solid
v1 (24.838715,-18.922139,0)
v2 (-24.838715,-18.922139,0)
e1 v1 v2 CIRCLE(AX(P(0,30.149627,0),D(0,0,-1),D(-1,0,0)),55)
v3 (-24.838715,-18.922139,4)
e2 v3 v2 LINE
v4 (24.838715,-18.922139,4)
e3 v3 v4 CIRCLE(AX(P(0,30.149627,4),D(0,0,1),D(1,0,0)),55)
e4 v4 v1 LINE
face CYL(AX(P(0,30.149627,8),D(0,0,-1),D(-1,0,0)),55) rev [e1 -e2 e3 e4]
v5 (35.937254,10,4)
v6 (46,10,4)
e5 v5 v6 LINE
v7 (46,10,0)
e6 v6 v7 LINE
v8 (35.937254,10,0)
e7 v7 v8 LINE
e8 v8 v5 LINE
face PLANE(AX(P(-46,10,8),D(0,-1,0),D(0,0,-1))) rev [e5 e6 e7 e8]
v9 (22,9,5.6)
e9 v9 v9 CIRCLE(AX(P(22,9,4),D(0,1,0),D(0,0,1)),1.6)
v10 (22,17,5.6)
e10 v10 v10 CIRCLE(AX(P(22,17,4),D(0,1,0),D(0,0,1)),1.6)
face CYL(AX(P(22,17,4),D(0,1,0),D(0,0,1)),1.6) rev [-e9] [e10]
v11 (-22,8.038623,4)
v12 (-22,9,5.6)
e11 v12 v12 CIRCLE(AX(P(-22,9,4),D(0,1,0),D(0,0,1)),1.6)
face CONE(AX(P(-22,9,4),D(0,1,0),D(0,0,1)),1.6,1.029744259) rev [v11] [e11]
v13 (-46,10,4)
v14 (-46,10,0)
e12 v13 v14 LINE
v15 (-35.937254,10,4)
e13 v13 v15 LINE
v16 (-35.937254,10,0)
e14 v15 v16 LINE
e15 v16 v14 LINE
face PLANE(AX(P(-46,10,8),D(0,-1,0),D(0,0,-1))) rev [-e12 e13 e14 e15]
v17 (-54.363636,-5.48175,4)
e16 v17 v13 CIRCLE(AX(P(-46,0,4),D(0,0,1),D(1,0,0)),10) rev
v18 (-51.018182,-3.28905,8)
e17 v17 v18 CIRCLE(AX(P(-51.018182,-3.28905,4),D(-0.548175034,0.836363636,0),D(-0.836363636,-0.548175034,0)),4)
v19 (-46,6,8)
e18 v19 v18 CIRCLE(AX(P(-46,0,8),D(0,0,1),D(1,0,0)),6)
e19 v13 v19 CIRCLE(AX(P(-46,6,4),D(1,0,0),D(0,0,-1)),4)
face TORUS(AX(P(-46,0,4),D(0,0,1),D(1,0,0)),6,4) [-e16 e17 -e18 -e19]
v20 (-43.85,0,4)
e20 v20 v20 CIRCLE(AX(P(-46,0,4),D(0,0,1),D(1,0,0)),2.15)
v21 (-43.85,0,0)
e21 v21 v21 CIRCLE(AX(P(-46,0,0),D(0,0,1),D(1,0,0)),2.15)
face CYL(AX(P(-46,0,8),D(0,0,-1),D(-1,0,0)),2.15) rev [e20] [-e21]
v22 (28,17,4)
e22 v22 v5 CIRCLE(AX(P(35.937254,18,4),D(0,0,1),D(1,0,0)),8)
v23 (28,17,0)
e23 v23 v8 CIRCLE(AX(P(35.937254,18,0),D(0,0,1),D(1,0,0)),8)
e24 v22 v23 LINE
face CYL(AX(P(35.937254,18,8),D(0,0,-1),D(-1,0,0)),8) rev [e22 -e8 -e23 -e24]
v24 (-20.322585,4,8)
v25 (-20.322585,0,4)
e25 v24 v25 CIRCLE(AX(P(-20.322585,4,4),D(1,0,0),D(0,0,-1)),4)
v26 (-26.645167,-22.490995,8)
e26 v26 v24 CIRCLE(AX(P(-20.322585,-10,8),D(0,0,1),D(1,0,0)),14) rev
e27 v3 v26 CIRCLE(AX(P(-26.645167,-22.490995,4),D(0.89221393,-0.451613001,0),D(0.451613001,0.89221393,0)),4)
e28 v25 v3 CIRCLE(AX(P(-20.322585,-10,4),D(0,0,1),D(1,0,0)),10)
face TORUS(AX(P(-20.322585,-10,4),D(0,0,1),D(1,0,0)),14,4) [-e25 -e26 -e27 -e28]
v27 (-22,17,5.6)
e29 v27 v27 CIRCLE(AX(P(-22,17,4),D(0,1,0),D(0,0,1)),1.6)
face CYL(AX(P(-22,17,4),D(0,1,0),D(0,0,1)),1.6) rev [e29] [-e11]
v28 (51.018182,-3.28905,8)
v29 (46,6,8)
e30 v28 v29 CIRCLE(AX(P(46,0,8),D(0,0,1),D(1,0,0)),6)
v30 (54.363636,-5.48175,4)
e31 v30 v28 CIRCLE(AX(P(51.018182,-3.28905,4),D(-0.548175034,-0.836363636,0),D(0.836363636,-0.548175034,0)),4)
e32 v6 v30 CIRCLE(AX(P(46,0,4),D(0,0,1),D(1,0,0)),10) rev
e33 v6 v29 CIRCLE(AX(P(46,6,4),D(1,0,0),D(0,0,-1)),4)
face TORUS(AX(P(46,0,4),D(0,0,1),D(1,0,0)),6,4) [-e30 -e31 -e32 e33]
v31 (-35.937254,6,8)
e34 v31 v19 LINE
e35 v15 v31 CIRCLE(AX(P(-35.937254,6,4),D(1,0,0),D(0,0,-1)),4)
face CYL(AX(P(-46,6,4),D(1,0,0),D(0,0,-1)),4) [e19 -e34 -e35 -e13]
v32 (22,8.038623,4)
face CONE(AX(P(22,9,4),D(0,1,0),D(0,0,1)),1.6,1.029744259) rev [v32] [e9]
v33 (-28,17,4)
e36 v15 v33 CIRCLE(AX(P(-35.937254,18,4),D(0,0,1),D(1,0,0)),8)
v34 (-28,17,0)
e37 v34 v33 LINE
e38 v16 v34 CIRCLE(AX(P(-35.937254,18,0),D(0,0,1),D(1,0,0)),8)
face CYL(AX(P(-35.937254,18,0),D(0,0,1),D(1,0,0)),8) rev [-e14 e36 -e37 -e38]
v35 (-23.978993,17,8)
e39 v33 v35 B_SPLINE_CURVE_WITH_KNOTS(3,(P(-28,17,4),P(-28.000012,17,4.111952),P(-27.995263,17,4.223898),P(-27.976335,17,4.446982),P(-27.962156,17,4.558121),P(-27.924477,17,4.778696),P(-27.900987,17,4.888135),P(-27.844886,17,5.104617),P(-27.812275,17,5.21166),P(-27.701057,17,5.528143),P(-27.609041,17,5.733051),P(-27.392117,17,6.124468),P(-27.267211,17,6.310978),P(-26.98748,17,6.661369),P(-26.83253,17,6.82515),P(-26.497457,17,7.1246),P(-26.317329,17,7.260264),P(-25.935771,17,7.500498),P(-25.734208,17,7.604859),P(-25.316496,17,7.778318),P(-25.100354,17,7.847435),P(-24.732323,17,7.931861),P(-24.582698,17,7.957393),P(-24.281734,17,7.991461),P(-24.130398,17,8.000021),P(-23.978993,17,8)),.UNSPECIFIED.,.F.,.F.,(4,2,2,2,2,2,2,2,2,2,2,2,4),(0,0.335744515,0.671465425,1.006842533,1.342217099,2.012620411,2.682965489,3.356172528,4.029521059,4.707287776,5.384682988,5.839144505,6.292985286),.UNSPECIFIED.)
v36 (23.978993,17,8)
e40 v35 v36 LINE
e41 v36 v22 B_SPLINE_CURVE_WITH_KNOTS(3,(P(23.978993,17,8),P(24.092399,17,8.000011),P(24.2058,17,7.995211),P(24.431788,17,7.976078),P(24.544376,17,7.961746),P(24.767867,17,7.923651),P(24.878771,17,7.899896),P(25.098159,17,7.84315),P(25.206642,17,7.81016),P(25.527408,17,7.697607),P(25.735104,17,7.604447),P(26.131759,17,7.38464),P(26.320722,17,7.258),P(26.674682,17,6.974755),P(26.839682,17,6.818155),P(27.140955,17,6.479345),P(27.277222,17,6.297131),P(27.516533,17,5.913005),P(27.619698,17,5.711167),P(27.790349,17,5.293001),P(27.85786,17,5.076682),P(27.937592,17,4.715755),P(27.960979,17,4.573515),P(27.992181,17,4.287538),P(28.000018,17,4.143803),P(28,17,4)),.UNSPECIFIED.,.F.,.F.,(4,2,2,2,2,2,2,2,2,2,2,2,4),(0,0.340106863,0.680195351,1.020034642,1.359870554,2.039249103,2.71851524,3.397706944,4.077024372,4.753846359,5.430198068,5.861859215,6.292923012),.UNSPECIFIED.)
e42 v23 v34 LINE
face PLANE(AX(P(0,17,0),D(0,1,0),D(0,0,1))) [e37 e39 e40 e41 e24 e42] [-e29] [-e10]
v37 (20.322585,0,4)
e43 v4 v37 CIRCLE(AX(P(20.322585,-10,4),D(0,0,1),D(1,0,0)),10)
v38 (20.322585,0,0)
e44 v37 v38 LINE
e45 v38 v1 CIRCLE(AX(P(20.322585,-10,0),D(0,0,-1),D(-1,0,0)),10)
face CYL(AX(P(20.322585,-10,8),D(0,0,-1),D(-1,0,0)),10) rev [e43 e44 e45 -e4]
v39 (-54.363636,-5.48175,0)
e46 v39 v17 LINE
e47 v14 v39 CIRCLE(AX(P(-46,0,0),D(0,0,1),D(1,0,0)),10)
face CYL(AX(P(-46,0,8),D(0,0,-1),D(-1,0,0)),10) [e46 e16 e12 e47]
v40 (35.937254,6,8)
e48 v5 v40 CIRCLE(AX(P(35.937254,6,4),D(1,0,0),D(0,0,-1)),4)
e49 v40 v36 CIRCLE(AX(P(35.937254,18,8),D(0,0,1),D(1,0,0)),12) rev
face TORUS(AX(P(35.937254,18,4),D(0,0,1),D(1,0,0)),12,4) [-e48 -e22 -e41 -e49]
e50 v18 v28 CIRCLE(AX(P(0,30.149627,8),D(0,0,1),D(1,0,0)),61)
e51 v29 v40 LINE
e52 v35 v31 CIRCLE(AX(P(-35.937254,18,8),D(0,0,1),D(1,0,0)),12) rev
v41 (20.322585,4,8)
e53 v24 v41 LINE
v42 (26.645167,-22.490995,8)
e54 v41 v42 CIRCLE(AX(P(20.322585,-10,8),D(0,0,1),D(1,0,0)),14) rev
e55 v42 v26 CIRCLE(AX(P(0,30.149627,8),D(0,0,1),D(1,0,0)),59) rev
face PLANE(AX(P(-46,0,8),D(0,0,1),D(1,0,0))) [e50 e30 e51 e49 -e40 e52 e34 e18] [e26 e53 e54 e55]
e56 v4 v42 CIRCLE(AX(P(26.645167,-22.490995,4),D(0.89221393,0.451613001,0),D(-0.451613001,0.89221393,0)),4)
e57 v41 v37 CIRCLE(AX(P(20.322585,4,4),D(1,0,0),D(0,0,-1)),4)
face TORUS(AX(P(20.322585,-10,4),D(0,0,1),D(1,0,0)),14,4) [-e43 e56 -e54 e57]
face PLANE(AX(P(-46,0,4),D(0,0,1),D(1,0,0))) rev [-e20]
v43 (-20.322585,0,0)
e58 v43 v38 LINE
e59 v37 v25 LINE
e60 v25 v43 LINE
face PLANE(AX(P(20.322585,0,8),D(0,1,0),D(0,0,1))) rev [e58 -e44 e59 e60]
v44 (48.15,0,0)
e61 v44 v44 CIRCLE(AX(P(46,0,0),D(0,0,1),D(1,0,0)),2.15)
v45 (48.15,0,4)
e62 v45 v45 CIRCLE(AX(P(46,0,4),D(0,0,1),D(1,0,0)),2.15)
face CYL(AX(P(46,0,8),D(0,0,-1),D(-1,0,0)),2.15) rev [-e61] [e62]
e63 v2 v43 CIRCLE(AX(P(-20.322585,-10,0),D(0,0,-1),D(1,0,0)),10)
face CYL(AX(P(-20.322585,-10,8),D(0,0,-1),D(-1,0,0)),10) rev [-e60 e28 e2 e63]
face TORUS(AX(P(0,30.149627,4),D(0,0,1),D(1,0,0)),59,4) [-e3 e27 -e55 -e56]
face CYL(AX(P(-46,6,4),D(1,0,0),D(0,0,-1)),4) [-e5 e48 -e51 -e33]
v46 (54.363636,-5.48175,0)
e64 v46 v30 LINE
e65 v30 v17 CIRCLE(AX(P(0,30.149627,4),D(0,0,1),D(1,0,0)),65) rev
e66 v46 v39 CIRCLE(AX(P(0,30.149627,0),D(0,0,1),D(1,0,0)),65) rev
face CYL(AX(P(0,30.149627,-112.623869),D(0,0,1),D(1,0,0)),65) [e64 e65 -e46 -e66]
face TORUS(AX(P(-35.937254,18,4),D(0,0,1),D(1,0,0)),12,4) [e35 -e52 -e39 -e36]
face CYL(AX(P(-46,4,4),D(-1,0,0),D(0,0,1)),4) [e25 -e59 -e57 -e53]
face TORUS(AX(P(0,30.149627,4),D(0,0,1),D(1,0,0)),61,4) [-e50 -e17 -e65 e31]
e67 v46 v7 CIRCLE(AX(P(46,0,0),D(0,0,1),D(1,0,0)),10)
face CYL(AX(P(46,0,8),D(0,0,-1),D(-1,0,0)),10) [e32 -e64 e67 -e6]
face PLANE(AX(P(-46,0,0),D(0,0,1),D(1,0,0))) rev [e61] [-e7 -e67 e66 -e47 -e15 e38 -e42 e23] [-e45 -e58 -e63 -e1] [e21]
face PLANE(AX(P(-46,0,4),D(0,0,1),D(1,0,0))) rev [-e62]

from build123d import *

# Parameters (mm, degrees)
SKETCH1_R                = 2.15
BOSS_EXTRUDE1_DEPTH      = 8
BOSS_EXTRUDE2_START      = -4
BOSS_EXTRUDE2_DEPTH      = 4
SKETCH3_W                = 56
SKETCH3_H                = 8
BOSS_EXTRUDE6_DEPTH      = 7
BOSS_EXTRUDE4_START      = -8
BOSS_EXTRUDE4_DEPTH      = 8
CUT_EXTRUDE1_DEPTH       = 67.44206881
FILLET4_R                = 8
FILLET3_R                = 4
M3_CLEARANCE_HOLE1_D     = 3.2
M3_CLEARANCE_HOLE1_DEPTH = 8
M3_CLEARANCE_HOLE1_TIP   = 0.96137699


with BuildPart() as part:
    # Sketch1 → Boss-Extrude1 (new body)
    with BuildSketch(Plane.XY):
        with BuildLine():
            Line((-46, 10), (46, 10))
            ThreePointArc((46, 10), (56, 0), (46, -10))
            Line((46, -10), (-46, -10))
            ThreePointArc((-46, -10), (-56, 0), (-46, 10))
        make_face()
        with Locations((-46, 0)):
            Circle(SKETCH1_R, mode=Mode.SUBTRACT)
        with Locations((46, 0)):
            Circle(SKETCH1_R, mode=Mode.SUBTRACT)
    extrude(amount=BOSS_EXTRUDE1_DEPTH)

    # Sketch2 → Boss-Extrude2 (add)
    with BuildSketch(Plane.XY.offset(8).offset(BOSS_EXTRUDE2_START)):
        with BuildLine():
            Line((-46, -10), (46, -10))
            ThreePointArc((46, -10), (56, 0), (46, 10))
            Line((46, 10), (-46, 10))
            ThreePointArc((-46, 10), (-56, 0), (-46, -10))
        make_face()
    extrude(amount=BOSS_EXTRUDE2_DEPTH)

    # Sketch3 → Boss-Extrude6 (add)
    with BuildSketch(Plane(origin=(0, 10, 0), x_dir=(1, 0, 0), z_dir=(0, 1, 0))):
        with Locations((0, -4)):
            Rectangle(SKETCH3_W, SKETCH3_H)
    extrude(amount=BOSS_EXTRUDE6_DEPTH)

    # Sketch4 → Boss-Extrude4 (add)
    with BuildSketch(Plane.XY.offset(8).offset(BOSS_EXTRUDE4_START)):
        with BuildLine():
            Line((-46, -10), (46, -10))
            ThreePointArc((46, -10), (50.753025174, -8.798224349), (54.363636364, -5.481750339))
            ThreePointArc((54.363636364, -5.481750339), (0, -34.850373137), (-54.363636364, -5.481750339))
            ThreePointArc((-54.363636364, -5.481750339), (-50.753025174, -8.798224349), (-46, -10))
        make_face()
    extrude(amount=BOSS_EXTRUDE4_DEPTH)

    # Sketch5 → Cut-Extrude1 (cut, through all)
    with BuildSketch(Plane(origin=(0, 0, 0), x_dir=(-1, 0, 0), z_dir=(0, 0, -1))):
        with BuildLine():
            Line((-20.322585041, 0), (20.322585041, 0))
            ThreePointArc((20.322585041, 0), (30.049388036, -7.678512657), (24.83871505, -18.922139303))
            ThreePointArc((24.83871505, -18.922139303), (0, -24.850373137), (-24.83871505, -18.922139303))
            ThreePointArc((-24.83871505, -18.922139303), (-30.049388036, -7.678512657), (-20.322585041, 0))
        make_face()
    extrude(amount=-CUT_EXTRUDE1_DEPTH, mode=Mode.SUBTRACT)

    # Fillet4
    # the kernel refuses this fillet: 8 mm, written as the material it adds along each edge
    with BuildSketch(Plane(origin=(28, 10, 8), x_dir=(0, 1, 0), z_dir=(0, 0, -1))) as fillet4_piece_1:
        with BuildLine():
            CenterArc((8, 7.937253933), FILLET4_R, 180, 82.819244219)
            Line((0, 7.937253933), (-0.16, 7.937253933))
            Line((-0.16, 7.937253933), (-0.16, 0))
            Line((-0.16, 0), (0, -0.16))
            ThreePointArc((0, -0.16), (3.5, -0.16), (6.98, -0.158745079))
            Line((6.98, -0.158745079), (7, 0))
        make_face()
    extrude(amount=8)
    with BuildSketch(Plane(origin=(-28, 10, 0), x_dir=(-1, 0, 0), z_dir=(0, 0, 1))) as fillet4_piece_2:
        with BuildLine():
            CenterArc((7.937253933, -8), FILLET4_R, 90, 82.819244219)
            Line((0, -7), (-0.158745079, -6.98))
            ThreePointArc((-0.158745079, -6.98), (-0.16, -3.5), (-0.16, 0))
            Line((-0.16, 0), (0, 0.16))
            Line((0, 0.16), (7.937253933, 0.16))
            Line((7.937253933, 0.16), (7.937253933, 0))
        make_face()
    extrude(amount=8)

    # Fillet3
    fillet3_edges = [part.edges().sort_by_distance(p)[0] for p in [
        (40.968626967, 10, 8),
        (-54.798224349, 4.753025174, 8),
        (54.798224349, 4.753025174, 8),
        (0, -34.850373137, 8),
        (-30.049388036, -7.678512657, 8),
        (0, -24.850373137, 8),
        (30.049388036, -7.678512657, 8),
        (0, 0, 8),
        (-40.968626967, 10, 8),
        (30.645751311, 12, 8),
        (-30.645751311, 12, 8),
    ]]
    fillet(fillet3_edges, radius=FILLET3_R)

    # M3 Clearance Hole1
    with Locations(Plane(origin=(0, 17, 0), x_dir=(1, 0, 0), z_dir=(0, 1, 0))):
        with Locations((-22, -4), (22, -4)):
            Hole(M3_CLEARANCE_HOLE1_D / 2, depth=M3_CLEARANCE_HOLE1_DEPTH)
            with Locations((0, 0, -(M3_CLEARANCE_HOLE1_DEPTH + M3_CLEARANCE_HOLE1_TIP / 2))):  # 118° drill point
                Cone(0, M3_CLEARANCE_HOLE1_D / 2, M3_CLEARANCE_HOLE1_TIP, mode=Mode.SUBTRACT)


solid = part.part
